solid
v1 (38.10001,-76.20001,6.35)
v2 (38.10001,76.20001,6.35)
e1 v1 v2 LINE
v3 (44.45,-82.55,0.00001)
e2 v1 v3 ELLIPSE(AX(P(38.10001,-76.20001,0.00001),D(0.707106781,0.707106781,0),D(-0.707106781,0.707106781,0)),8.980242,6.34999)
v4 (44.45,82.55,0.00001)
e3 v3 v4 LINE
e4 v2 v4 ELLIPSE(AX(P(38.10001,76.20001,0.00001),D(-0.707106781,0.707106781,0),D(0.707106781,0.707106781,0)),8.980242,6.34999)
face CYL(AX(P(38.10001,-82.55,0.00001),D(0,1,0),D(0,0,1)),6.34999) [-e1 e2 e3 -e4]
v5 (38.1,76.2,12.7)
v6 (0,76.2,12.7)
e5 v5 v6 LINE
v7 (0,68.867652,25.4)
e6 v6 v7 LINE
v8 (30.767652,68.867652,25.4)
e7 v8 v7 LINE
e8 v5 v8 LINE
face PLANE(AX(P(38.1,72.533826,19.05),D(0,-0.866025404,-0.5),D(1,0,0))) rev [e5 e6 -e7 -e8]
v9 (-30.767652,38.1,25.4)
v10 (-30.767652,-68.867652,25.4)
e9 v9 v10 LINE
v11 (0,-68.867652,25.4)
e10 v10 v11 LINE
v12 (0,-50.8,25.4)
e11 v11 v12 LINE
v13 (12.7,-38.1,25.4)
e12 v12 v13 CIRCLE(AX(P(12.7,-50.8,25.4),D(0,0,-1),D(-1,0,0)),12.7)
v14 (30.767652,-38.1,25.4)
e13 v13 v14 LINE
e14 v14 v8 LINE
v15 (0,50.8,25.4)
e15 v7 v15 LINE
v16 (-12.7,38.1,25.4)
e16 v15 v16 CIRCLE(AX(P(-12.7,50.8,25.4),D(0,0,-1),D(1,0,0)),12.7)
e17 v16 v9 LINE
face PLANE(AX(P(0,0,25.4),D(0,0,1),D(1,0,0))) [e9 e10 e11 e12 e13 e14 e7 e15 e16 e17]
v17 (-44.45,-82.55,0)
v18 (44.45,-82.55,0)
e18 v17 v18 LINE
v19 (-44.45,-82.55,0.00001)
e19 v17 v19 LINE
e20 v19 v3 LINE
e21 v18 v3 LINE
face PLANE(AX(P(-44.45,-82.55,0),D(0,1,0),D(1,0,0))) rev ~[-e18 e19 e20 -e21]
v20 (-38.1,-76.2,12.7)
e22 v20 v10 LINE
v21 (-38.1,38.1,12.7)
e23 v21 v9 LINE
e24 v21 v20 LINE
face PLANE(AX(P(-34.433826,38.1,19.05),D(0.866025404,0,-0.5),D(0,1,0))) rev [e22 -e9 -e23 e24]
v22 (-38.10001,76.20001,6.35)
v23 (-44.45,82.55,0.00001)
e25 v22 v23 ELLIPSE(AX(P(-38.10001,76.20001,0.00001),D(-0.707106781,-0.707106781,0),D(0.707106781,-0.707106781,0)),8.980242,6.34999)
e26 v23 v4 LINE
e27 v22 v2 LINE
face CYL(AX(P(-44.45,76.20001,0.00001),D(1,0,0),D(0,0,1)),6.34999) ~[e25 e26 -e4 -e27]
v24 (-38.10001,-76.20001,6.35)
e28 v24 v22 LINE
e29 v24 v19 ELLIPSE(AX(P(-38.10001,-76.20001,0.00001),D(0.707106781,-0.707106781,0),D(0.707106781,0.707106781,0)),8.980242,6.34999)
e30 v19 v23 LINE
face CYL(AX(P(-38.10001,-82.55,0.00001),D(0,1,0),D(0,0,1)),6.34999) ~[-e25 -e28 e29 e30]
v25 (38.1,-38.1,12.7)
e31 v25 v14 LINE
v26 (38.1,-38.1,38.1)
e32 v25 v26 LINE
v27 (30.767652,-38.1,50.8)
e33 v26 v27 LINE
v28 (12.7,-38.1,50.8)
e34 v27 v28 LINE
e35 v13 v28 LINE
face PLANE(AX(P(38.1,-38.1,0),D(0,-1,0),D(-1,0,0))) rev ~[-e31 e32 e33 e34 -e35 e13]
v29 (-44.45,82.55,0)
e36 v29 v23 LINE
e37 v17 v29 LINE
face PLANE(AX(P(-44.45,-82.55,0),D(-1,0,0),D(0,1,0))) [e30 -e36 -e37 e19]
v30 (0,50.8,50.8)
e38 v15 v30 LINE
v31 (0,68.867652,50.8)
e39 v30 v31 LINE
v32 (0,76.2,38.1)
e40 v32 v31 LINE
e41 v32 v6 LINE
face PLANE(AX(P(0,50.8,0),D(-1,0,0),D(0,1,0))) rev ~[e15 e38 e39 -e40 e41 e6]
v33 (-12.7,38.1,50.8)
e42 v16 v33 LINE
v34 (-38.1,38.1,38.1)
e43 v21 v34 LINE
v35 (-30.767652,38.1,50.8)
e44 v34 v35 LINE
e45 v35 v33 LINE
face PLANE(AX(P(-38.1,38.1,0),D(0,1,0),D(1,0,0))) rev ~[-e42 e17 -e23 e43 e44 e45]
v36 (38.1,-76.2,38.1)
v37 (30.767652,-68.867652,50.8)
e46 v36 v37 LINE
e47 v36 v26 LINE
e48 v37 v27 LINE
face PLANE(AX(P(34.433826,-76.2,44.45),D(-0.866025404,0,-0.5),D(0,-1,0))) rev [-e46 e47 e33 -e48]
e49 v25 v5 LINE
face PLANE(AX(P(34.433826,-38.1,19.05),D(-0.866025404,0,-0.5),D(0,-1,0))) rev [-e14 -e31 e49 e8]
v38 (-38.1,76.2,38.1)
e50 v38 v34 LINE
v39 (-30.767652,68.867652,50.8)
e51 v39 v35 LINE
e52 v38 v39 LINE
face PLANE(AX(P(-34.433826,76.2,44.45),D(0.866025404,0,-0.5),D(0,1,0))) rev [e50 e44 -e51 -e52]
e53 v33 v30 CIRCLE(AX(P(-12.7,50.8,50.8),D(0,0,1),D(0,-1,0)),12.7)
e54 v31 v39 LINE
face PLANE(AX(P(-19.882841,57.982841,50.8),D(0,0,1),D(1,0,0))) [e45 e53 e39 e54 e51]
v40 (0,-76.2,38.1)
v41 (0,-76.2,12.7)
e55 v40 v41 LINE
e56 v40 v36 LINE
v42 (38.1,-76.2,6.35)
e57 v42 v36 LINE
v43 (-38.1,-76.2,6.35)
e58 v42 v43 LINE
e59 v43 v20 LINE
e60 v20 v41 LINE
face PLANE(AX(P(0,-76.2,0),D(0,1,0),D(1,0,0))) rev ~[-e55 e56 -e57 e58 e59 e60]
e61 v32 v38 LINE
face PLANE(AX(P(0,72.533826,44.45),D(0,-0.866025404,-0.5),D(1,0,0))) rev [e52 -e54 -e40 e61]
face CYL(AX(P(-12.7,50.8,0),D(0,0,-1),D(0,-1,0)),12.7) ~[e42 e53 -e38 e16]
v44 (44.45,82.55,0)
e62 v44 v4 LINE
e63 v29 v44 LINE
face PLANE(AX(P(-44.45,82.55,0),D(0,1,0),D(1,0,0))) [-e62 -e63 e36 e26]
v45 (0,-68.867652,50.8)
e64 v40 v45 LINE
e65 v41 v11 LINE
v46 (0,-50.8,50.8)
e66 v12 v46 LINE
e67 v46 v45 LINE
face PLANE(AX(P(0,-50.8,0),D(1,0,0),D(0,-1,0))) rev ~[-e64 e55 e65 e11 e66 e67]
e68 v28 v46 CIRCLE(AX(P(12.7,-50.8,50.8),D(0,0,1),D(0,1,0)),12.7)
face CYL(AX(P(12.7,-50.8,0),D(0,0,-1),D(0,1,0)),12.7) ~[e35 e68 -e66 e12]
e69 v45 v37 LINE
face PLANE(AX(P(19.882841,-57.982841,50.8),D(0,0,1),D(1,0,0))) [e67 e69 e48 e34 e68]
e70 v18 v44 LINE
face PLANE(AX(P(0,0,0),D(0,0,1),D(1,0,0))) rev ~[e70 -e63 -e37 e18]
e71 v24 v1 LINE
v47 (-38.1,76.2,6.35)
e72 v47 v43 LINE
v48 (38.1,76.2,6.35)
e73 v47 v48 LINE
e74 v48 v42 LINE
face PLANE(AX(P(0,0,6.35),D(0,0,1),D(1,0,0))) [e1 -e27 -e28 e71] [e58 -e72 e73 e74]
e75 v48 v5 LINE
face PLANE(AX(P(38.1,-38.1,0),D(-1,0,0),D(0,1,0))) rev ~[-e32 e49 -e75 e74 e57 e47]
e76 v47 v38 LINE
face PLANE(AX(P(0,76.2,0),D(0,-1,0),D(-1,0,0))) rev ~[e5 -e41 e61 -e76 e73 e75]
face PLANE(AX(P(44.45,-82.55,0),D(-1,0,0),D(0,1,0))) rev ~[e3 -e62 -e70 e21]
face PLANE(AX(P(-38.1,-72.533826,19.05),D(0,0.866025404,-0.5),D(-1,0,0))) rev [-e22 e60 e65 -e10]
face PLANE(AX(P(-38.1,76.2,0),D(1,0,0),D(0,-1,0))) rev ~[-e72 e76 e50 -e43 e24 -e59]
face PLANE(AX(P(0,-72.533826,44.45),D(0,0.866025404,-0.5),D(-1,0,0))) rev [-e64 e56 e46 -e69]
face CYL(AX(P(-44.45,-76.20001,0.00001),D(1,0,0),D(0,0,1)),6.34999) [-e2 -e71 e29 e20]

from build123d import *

# Parameters (mm, degrees)
F0_W     = 88.9
F0_H     = 165.1
F1_DEPTH = 6.35
F2_DEPTH = 25.4
F3_DEPTH = 50.8
F4_SIZE2 = 7.3323484187
F4_SIZE  = 12.7
F5_R     = 6.34999
F6_SIZE2 = 7.3323484187
F6_SIZE  = 12.7


# Not quite as in the source:
# - a fillet or chamfer is up to 0.001 mm smaller than in the source, because OpenCascade refuses the exact size


with BuildPart() as f1:
    # F0 (on Top) → F1 (new body)
    with BuildSketch(Plane.XY):
        Rectangle(F0_W, F0_H)
        Polygon((38.1, -38.1), (38.1, -76.2), (0, -76.2), (-38.1, -76.2), (-38.1, 38.1), (-38.1, 76.2), (0, 76.2), (38.1, 76.2), align=None, mode=Mode.SUBTRACT)
    extrude(amount=F1_DEPTH)

    # F0 (on Top) → F2 (join)
    with BuildSketch(Plane.XY):
        with BuildLine():
            Line((-38.1, -76.2), (0, -76.2))
            Line((0, -76.2), (0, -50.8))
            ThreePointArc((0, -50.8), (3.7197438789, -41.8197438789), (12.7, -38.1))
            Line((12.7, -38.1), (38.1, -38.1))
            Line((38.1, -38.1), (38.1, 76.2))
            Line((38.1, 76.2), (0, 76.2))
            Line((0, 76.2), (0, 50.8))
            ThreePointArc((0, 50.8), (-3.7197438789, 41.8197438789), (-12.7, 38.1))
            Line((-12.7, 38.1), (-38.1, 38.1))
            Line((-38.1, 38.1), (-38.1, -76.2))
        make_face()
    extrude(amount=F2_DEPTH)

    # F0 (on Top) → F3 (join)
    with BuildSketch(Plane.XY):
        with BuildLine():
            Line((-38.1, 76.2), (-38.1, 38.1))
            Line((-38.1, 38.1), (-12.7, 38.1))
            ThreePointArc((-12.7, 38.1), (-3.7197438789, 41.8197438789), (0, 50.8))
            Line((0, 50.8), (0, 76.2))
            Line((0, 76.2), (-38.1, 76.2))
        make_face()
        with BuildLine():
            Line((0, -76.2), (38.1, -76.2))
            Line((38.1, -76.2), (38.1, -38.1))
            Line((38.1, -38.1), (12.7, -38.1))
            ThreePointArc((12.7, -38.1), (3.7197438789, -41.8197438789), (0, -50.8))
            Line((0, -50.8), (0, -76.2))
        make_face()
    extrude(amount=F3_DEPTH)

    # F4
    f4_edges = [f1.edges().sort_by_distance(p)[0] for p in [
        (19.05, -76.2, 50.8),
        (38.1, -57.15, 50.8),
        (-19.05, -76.2, 25.4),
        (-38.1, -19.05, 25.4),
        (-38.1, 57.15, 50.8),
    ]]
    chamfer(f4_edges, length=F4_SIZE, length2=F4_SIZE2)

    # F5 (radius 6.35 in the source; OpenCascade refuses exactly that, so slightly less here)
    f5_edges = [f1.edges().sort_by_distance(p)[0] for p in [
        (0, 82.55, 6.35),
        (44.45, 0, 6.35),
        (-44.45, 0, 6.35),
        (0, -82.55, 6.35),
    ]]
    fillet(f5_edges, radius=F5_R)

    # F6
    f6_edges = [f1.edges().sort_by_distance(p)[0] for p in [
        (-12.7, 76.2, 50.8),
        (19.05, 76.2, 25.4),
        (38.1, 19.05, 25.4),
    ]]
    chamfer(f6_edges, length=F6_SIZE, length2=F6_SIZE2)


solid = f1.part
